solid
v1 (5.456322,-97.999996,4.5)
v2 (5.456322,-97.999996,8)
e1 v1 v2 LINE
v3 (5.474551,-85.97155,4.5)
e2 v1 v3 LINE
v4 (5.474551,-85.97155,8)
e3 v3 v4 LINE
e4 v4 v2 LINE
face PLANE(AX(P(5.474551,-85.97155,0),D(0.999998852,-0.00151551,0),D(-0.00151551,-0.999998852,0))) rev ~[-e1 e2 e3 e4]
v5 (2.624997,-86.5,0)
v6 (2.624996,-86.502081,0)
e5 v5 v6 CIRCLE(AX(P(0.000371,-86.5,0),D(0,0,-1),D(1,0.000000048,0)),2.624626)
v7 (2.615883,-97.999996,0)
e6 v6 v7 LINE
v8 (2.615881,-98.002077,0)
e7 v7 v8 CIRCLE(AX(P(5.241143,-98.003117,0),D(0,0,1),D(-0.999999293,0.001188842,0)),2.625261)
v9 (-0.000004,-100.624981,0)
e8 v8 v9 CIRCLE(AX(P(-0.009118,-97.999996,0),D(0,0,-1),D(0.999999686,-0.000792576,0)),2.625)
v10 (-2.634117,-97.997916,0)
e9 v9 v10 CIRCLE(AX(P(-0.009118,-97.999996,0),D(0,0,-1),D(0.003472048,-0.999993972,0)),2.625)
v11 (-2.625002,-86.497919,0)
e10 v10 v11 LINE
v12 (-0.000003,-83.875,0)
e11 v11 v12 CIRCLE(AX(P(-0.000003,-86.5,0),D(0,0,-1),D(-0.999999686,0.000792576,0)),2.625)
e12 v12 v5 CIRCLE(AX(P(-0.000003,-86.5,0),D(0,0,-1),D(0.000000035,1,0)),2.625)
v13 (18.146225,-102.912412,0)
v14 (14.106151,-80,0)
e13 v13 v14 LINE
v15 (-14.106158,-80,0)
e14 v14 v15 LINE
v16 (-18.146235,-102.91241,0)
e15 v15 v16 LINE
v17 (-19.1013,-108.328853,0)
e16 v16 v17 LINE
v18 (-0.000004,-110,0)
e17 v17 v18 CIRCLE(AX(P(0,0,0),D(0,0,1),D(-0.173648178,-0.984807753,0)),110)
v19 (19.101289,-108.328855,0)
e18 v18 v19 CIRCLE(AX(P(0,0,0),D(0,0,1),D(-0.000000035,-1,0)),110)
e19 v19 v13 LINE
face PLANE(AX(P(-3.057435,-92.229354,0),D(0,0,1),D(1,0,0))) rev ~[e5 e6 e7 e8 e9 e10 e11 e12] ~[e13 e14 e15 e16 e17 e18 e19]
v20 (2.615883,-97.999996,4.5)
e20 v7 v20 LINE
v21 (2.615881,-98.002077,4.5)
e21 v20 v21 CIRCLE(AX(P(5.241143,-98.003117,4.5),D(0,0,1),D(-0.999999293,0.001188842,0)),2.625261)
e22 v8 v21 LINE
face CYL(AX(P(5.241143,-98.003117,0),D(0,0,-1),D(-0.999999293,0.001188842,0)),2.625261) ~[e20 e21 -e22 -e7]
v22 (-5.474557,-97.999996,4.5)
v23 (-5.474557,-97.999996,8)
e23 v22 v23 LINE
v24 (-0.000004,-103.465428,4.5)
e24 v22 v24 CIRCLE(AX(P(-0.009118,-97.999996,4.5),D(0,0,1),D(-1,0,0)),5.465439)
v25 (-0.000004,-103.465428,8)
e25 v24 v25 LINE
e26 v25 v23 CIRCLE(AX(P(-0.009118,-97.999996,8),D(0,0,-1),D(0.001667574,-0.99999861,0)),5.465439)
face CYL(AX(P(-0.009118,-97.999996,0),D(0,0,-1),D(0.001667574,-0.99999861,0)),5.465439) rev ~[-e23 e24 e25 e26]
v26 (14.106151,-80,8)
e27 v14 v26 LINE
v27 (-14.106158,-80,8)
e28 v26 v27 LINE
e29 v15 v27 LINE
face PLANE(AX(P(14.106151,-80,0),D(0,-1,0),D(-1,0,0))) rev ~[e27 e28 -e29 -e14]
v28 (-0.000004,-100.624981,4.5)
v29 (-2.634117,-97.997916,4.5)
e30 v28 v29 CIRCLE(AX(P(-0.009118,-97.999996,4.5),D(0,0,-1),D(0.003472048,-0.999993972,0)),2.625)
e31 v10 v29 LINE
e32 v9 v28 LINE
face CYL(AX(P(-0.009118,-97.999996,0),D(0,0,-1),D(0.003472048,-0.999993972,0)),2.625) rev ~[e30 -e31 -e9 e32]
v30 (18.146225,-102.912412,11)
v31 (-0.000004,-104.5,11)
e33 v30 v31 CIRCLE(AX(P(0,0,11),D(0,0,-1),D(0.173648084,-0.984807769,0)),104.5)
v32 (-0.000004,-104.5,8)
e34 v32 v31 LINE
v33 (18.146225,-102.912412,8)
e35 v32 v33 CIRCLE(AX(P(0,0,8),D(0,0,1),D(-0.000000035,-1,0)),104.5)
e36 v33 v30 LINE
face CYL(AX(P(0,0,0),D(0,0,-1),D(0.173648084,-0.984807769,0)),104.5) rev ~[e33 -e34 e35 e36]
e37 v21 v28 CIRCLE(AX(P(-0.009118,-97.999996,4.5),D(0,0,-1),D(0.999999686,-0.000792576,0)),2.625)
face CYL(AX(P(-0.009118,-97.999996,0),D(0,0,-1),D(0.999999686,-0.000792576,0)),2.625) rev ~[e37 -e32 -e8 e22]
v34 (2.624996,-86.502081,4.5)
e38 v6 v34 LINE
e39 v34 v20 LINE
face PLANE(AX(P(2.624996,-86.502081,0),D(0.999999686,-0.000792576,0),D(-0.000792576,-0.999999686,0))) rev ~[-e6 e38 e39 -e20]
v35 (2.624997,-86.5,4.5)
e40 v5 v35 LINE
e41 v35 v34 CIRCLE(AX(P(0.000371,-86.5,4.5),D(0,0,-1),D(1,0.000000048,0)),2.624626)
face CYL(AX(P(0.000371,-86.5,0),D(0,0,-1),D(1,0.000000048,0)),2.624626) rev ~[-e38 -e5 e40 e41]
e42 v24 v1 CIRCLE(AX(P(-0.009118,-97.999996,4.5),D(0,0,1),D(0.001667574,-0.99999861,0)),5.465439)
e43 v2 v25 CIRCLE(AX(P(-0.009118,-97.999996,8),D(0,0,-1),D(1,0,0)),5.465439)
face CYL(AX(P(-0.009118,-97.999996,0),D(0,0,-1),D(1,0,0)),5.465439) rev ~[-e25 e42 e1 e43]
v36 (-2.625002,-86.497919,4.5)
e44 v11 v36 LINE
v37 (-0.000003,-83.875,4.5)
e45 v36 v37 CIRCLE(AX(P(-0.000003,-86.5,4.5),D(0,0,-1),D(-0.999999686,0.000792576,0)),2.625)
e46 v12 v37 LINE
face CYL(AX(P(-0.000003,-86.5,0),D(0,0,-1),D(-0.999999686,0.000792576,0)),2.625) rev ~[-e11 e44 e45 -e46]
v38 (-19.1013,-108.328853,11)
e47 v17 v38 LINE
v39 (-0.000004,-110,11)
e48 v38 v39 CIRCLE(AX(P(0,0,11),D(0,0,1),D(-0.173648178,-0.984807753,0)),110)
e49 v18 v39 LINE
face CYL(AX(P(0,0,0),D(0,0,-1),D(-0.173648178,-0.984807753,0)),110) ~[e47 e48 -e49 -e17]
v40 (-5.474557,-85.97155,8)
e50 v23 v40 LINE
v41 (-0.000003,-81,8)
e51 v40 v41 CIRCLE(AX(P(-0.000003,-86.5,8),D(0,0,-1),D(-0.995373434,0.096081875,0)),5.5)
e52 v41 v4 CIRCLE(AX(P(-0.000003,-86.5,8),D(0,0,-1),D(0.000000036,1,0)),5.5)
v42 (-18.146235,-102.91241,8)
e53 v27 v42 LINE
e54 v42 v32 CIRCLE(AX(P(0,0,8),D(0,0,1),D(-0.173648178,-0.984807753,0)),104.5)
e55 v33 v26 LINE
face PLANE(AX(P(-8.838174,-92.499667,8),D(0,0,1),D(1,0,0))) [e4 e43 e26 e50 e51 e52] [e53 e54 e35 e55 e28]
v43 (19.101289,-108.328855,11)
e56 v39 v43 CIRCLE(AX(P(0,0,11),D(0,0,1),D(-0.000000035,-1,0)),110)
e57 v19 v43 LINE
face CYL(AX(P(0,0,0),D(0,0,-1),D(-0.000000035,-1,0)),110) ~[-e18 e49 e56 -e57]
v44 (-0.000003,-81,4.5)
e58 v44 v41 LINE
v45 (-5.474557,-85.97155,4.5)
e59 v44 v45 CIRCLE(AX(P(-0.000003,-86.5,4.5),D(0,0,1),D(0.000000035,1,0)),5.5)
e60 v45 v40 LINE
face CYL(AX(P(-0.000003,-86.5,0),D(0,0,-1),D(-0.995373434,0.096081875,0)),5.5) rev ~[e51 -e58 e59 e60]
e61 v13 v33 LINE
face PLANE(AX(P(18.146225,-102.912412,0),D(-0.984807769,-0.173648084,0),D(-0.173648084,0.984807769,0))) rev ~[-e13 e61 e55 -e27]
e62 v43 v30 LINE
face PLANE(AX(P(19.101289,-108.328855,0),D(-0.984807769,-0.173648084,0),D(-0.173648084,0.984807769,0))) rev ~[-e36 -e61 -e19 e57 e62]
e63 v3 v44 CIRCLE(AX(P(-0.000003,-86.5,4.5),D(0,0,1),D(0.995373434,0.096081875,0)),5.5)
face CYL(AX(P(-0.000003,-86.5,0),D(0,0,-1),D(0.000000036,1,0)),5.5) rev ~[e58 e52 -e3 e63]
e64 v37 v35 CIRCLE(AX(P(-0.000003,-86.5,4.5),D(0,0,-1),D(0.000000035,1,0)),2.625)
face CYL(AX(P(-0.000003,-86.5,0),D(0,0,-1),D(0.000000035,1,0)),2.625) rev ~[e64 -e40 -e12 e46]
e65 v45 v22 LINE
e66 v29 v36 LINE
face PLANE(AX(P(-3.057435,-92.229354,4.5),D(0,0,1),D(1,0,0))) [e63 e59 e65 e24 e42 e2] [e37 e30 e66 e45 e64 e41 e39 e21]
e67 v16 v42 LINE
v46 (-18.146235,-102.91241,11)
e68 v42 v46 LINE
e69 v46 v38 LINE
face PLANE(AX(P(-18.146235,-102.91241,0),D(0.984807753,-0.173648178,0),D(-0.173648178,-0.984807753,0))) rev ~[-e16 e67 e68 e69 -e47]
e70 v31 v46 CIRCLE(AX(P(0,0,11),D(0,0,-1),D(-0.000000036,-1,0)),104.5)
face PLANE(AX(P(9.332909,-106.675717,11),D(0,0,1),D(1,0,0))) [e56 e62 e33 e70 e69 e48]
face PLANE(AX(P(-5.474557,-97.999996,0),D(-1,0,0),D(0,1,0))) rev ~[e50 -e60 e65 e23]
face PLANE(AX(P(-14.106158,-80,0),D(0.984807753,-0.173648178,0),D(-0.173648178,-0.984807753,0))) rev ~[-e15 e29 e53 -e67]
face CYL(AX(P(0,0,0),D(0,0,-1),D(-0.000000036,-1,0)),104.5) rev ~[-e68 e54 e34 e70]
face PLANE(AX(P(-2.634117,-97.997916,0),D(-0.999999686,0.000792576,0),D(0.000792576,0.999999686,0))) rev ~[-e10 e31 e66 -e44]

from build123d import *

# Parameters (mm, degrees)
F1_DEPTH = 11
F2_DEPTH = 8
F3_DEPTH = 4.5


# Not quite as in the source:
# - ends of sketch curves that miss each other by under 0.0002 mm in the source are joined
# - a feature names something its author has since deleted; it is built from what else it names


with BuildPart() as f1:
    # F0 (on Top) → F1 (new body)
    with BuildSketch(Plane.XY):
        with BuildLine():
            ThreePointArc((-3.905e-06, -110), (9.5871245695, -109.5814174141), (19.1012892866, -108.3288546399))
            Line((19.1012892866, -108.3288546399), (18.1462248222, -102.9124119079))
            ThreePointArc((18.1462248222, -102.9124119079), (9.107768341, -104.1023465434), (-3.7098e-06, -104.5))
            Line((-3.7098e-06, -104.5), (-3.905e-06, -110))
        make_face()
        with BuildLine():
            Line((-18.1462345662, -102.9124101898), (-19.1012995434, -108.3288528313))
            ThreePointArc((-19.1012995434, -108.3288528313), (-9.5871336473, -109.5814166199), (-3.905e-06, -110))
            Line((-3.905e-06, -110), (-3.7098e-06, -104.5))
            ThreePointArc((-3.7098e-06, -104.5), (-9.107776965, -104.1023457889), (-18.1462345662, -102.9124101898))
        make_face()
    extrude(amount=F1_DEPTH)

    # F0 (on Top) → F2 (join)
    with BuildSketch(Plane.XY):
        with BuildLine():
            Line((-14.1061584567, -80), (-18.1462345662, -102.9124101898))
            ThreePointArc((-18.1462345662, -102.9124101898), (-9.107776965, -104.1023457889), (-3.7098e-06, -104.5))
            Line((-3.7098e-06, -104.5), (-3.673e-06, -103.4654280496))
            ThreePointArc((-3.673e-06, -103.4654280496), (-3.8705432222, -101.8678665034), (-5.4745569582, -97.999996388))
            Line((-5.4745569582, -97.999996388), (-5.4745569582, -85.9715496865))
            ThreePointArc((-5.4745569582, -85.9715496865), (-3.6975375335, -82.4283616447), (-2.8755e-06, -81))
            Line((-2.8755e-06, -81), (-2.84e-06, -80))
            Line((-2.84e-06, -80), (-14.1061584567, -80))
        make_face()
        with BuildLine():
            ThreePointArc((-3.7098e-06, -104.5), (9.107768341, -104.1023465434), (18.1462248222, -102.9124119079))
            Line((18.1462248222, -102.9124119079), (14.1061506466, -80))
            Line((14.1061506466, -80), (-2.84e-06, -80))
            Line((-2.84e-06, -80), (-2.8755e-06, -81))
            ThreePointArc((-2.8755e-06, -81), (3.6975315365, -82.4283617759), (5.4745508166, -85.9715496865))
            Line((5.4745508166, -85.9715496865), (5.4563215634, -97.999996388))
            ThreePointArc((5.4563215634, -97.999996388), (3.8587524181, -101.8614219128), (-3.673e-06, -103.4654280496))
            Line((-3.673e-06, -103.4654280496), (-3.7098e-06, -104.5))
        make_face()
    extrude(amount=F2_DEPTH)

    # F0 (on Top) → F3 (join)
    with BuildSketch(Plane.XY):
        with BuildLine():
            ThreePointArc((-5.4745569582, -97.999996388), (-3.8705432222, -101.8678665034), (-3.673e-06, -103.4654280496))
            Line((-3.673e-06, -103.4654280496), (-3.5722e-06, -100.6249805656))
            ThreePointArc((-3.5722e-06, -100.6249805656), (-1.862784569, -99.858636786), (-2.6341168729, -97.9979158754))
            Line((-2.6341168729, -97.9979158754), (-2.6250022463, -86.4979194874))
            ThreePointArc((-2.6250022463, -86.4979194874), (-1.8554226203, -84.6431092399), (-2.9776e-06, -83.875))
            Line((-2.9776e-06, -83.875), (-2.8755e-06, -81))
            ThreePointArc((-2.8755e-06, -81), (-3.6975375335, -82.4283616447), (-5.4745569582, -85.9715496865))
            Line((-5.4745569582, -85.9715496865), (-5.4745569582, -97.999996388))
        make_face()
        with BuildLine():
            Line((-3.5722e-06, -100.6249805656), (-3.673e-06, -103.4654280496))
            ThreePointArc((-3.673e-06, -103.4654280496), (3.8587524181, -101.8614219128), (5.4563215634, -97.999996388))
            Line((5.4563215634, -97.999996388), (5.4745508166, -85.9715496865))
            ThreePointArc((5.4745508166, -85.9715496865), (3.6975315365, -82.4283617759), (-2.8755e-06, -81))
            Line((-2.8755e-06, -81), (-2.9776e-06, -83.875))
            ThreePointArc((-2.9776e-06, -83.875), (1.8561522628, -84.6438447323), (2.6249969292, -86.5))
            ThreePointArc((2.6249969292, -86.5), (2.6249967231, -86.5010402564), (2.6249961047, -86.5020805126))
            Line((2.6249961047, -86.5020805126), (2.6158831271, -97.9999963886))
            ThreePointArc((2.6158831271, -97.9999963886), (2.6158820965, -98.0010366444), (2.6158814781, -98.0020769006))
            ThreePointArc((2.6158814781, -98.0020769006), (1.8495227006, -99.8536632596), (-3.5722e-06, -100.6249805656))
        make_face()
    extrude(amount=F3_DEPTH)


solid = f1.part
